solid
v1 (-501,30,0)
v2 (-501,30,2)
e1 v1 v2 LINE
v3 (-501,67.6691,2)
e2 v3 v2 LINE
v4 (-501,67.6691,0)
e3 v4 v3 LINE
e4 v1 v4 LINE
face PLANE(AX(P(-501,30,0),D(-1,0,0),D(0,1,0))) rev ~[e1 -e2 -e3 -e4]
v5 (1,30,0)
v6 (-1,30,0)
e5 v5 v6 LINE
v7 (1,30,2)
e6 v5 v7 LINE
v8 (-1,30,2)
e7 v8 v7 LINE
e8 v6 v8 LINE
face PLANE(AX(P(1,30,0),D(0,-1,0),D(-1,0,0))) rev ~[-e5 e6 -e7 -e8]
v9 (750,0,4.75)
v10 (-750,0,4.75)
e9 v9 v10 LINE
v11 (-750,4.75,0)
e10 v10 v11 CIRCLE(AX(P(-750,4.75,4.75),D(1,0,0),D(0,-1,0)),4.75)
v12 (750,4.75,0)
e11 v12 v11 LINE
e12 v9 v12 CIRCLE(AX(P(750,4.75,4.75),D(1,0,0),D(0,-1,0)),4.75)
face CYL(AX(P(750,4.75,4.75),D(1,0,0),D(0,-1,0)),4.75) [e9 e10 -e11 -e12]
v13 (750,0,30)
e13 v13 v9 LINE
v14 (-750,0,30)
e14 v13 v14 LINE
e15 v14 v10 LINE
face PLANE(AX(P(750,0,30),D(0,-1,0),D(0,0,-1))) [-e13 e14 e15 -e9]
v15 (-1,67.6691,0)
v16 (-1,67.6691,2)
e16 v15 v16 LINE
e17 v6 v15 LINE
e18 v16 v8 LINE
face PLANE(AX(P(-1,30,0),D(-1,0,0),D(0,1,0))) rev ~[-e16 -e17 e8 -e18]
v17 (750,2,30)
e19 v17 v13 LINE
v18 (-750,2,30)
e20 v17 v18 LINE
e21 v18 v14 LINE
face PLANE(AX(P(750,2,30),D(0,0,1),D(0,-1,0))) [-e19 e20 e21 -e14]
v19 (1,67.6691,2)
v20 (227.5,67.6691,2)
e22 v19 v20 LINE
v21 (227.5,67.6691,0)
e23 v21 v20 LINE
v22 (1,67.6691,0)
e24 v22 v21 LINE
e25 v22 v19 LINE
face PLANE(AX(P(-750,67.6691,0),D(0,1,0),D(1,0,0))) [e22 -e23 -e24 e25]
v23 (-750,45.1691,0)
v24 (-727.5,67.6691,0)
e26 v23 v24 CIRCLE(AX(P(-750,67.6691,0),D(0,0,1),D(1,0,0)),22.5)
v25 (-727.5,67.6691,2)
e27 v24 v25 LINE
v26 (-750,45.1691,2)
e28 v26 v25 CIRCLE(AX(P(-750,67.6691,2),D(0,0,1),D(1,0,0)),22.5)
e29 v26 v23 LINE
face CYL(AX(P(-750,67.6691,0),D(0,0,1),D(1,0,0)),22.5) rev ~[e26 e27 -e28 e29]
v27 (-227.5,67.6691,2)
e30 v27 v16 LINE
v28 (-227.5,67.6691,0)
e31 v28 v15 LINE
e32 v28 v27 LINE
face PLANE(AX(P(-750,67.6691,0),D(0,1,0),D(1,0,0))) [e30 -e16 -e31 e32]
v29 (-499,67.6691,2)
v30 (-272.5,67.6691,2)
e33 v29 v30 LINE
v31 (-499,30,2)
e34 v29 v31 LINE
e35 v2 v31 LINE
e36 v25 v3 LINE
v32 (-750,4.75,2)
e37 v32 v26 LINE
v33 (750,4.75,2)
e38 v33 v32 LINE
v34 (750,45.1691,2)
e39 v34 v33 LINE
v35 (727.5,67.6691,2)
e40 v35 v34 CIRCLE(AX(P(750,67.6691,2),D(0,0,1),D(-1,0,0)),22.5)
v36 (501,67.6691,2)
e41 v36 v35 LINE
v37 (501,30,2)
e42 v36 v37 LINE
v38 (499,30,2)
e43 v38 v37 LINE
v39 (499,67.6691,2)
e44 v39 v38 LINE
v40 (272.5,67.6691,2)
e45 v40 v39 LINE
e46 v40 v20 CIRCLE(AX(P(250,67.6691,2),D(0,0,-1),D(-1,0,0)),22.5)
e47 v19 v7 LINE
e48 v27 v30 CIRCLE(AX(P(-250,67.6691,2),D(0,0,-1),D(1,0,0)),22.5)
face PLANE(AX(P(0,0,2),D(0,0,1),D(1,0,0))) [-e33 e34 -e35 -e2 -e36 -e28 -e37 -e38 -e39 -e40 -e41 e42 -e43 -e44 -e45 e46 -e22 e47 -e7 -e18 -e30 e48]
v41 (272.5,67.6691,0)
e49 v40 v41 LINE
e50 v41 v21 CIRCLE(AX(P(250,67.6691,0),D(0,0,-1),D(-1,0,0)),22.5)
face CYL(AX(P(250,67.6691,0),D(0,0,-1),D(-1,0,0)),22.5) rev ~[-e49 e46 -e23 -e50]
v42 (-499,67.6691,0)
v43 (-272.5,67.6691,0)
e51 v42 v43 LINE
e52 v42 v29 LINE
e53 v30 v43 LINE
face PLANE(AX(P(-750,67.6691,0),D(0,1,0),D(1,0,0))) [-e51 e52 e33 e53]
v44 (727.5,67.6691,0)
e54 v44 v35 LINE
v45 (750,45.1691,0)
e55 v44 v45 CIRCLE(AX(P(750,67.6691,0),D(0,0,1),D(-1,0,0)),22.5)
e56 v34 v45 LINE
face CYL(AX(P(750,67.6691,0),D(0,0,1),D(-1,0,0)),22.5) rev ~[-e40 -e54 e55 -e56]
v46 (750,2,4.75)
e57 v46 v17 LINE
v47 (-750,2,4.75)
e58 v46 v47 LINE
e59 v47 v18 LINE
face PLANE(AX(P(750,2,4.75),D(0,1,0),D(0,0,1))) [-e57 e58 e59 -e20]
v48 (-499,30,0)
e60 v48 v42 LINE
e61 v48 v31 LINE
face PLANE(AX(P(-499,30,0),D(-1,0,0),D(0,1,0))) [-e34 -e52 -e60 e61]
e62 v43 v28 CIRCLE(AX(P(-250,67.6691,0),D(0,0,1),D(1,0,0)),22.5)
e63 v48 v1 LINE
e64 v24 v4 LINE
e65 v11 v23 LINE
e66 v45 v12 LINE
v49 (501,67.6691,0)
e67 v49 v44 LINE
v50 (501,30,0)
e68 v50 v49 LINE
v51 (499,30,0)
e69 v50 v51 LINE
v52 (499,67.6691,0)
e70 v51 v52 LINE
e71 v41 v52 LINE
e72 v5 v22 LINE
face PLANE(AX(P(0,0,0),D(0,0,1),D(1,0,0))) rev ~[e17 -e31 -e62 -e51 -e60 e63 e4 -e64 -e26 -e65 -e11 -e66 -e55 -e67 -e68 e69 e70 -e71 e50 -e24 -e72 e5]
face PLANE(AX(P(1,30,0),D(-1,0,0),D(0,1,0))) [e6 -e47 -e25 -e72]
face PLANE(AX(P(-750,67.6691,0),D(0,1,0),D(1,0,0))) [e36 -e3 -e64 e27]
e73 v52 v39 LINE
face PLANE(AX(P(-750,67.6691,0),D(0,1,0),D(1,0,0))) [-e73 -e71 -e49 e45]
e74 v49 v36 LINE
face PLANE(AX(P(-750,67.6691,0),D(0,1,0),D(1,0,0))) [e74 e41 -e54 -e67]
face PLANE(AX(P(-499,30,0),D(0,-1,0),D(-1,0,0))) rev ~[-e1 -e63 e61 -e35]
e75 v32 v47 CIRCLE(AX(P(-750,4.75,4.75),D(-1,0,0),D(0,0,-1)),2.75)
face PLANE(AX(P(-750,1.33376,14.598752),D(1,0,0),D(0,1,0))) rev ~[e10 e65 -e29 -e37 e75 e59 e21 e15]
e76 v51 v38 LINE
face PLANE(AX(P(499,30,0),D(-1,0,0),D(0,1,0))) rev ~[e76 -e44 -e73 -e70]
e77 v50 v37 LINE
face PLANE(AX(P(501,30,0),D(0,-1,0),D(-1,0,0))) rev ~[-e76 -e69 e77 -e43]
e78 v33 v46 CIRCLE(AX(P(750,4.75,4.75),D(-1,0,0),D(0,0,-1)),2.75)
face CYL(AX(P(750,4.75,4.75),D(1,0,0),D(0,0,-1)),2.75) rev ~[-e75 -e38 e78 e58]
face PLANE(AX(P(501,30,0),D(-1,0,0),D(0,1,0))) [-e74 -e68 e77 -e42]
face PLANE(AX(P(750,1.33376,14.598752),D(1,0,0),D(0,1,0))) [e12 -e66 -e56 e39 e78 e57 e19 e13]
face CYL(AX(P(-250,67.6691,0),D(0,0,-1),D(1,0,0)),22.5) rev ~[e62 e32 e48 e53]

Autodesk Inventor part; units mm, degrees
ref_plane "YZ Plane" through (0, 0, 0) normal (1, 0, 0) x (0, 1, 0)
ref_plane "XZ Plane" through (0, 0, 0) normal (0, 1, 0) x (-1, 0, 0)
ref_plane "XY Plane" through (0, 0, 0) normal (0, 0, 1) x (1, 0, 0)
sketch "Sketch1" plane through (0, 0, 0) normal (0, 0, 1) x (1, 0, 0)
  line L0 (-750, 67.6691) -> (750, 67.6691)
  line L1 (750, 67.6691) -> (750, 0)
  line L2 (750, 0) -> (-750, 0)
  line L3 (-750, 0) -> (-750, 67.6691)
  point P0 (0, 0)
  point P1 (0, 0)
  dimension "d0" = 1500
  dimension "d1" = 67.669
extrude "Plate1" add sketch "Sketch1" along normal blind 2
sketch "Sketch2" plane through (750, 2, 0) normal (0, -1, 0) x (1, 0, 0)
  line L0 (-1500, 0) -> (0, 0)
  line L1 (0, 0) -> (0, 30)
  line L2 (0, 30) -> (-1500, 30)
  line L3 (-1500, 30) -> (-1500, 0)
edge flange "Flange1" height 30 angle 90 thickness 2 bend radius 2.75 thickness toward (0, -1, 0) relief round relief width 2 relief depth 1 edges at (0, 0, 2) wall of the first edge with corners at (-750, 2, 0) (750, 2, 0) (750, 2, 30) (-750, 2, 30)
bend "Bend1"
corner "Corner1"
sketch "Sketch5" plane through (0, 0, 0) normal (0, 0, -1) x (-1, 0, 0)
  line L0 (750, 67.6691) -> (-750, 67.6691) projected
  line L1 (-1, 30) -> (-1, 67.6691)
  line L2 (750, 0) -> (-750, 0) projected
  line L3 (-1, 30) -> (1, 30)
  line L4 (1, 30) -> (1, 67.6691)
  point P0 (0, 0)
  point P1 (0, 30)
  point P2 (0, 0)
  dimension "d27" = 2
  dimension "d29" = 30
extrude "Extrusion1" cut sketch "Sketch5" against normal through all
pattern_linear "Rectangular Pattern1" count 3 spacing 500 along (1, 0, 0) of "Extrusion1" first direction both ways yes
sketch "Sketch6" plane through (0, 0, 0) normal (0, 0, -1) x (-1, 0, 0)
  line L0 (-750, 67.6691) -> (-750, 4.75) projected
  circle A0 centre (-750, 67.6691) radius 22.5
  line L1 (-750, 67.6691) -> (750, 67.6691) projected
  line L2 (-1, 67.6691) -> (-1, 30) projected
  line L3 (-499, 30) -> (-499, 67.6691) projected
  line L4 (-1, 30) -> (-499, 30) construction
  circle A1 centre (-250, 67.6691) radius 22.5
  point P0 (0, 0)
  point P1 (-727.5, 67.6691)
  point P2 (-750, 45.1691)
  point P3 (-250, 30)
  dimension "d24" = 45
extrude "Extrusion2" cut sketch "Sketch6" along normal mid plane 30 contours L1 A0 L0 | A1 L1 | L1 A1 picked at (-748.3311, 52.8571)
mirror "Mirror1" about plane through (0, 0, 0) normal (1, 0, 0) of "Extrusion2"
sketch "Sketch7" plane through (0, 0, 2) normal (0, 0, 1) x (1, 0, 0)
  arc A0 (-750, 45.1691) -> (-727.5, 67.6691) centre (-750, 67.6691) ccw projected
  line L0 (-750, 4.75) -> (-750, 45.1691) projected
  line L1 (-750, 4.75) -> (750, 4.75) projected
  line L2 (750, 45.1691) -> (750, 4.75) projected
  arc A1 (727.5, 67.6691) -> (750, 45.1691) centre (750, 67.6691) ccw projected
  line L3 (501, 67.6691) -> (727.5, 67.6691) projected
  line L4 (501, 67.6691) -> (501, 30) projected
  line L5 (501, 30) -> (499, 30) projected
  line L6 (499, 30) -> (499, 67.6691) projected
  line L7 (1, 67.6691) -> (227.5, 67.6691) projected
  line L8 (1, 67.6691) -> (1, 30) projected
  line L9 (1, 30) -> (-1, 30) projected
  line L10 (-1, 30) -> (-1, 67.6691) projected
  line L11 (-499, 67.6691) -> (-272.5, 67.6691) projected
  line L12 (-499, 67.6691) -> (-499, 30) projected
  line L13 (-499, 30) -> (-501, 30) projected
  line L14 (-501, 30) -> (-501, 67.6691) projected
  line L15 (-727.5, 67.6691) -> (-501, 67.6691) projected
  line L16 (649, 32.2095) -> (651, 32.2095)
  line L17 (651, 32.2095) -> (651, 40.2095)
  line L18 (651, 40.2095) -> (649, 40.2095)
  line L19 (649, 40.2095) -> (649, 32.2095)
  line L20 (-750, 4.75) -> (750, 4.75) projected
  line L21 (650, 4.75) -> (650, 67.6691) construction
  line L22 (637, 32.2095) -> (639, 32.2095)
  line L23 (639, 32.2095) -> (639, 40.2095)
  line L24 (639, 40.2095) -> (637, 40.2095)
  line L25 (637, 40.2095) -> (637, 32.2095)
  line L26 (272.5, 67.6691) -> (499, 67.6691) projected
  arc A2 (227.5, 67.6691) -> (272.5, 67.6691) centre (250, 67.6691) ccw projected
  line L27 (-227.5, 67.6691) -> (-1, 67.6691) projected
  arc A3 (-272.5, 67.6691) -> (-227.5, 67.6691) centre (-250, 67.6691) ccw projected
  point P0 (0, 0)
  point P1 (650, 32.2095)
  point P2 (649, 36.2095)
  point P3 (650, 36.2095)
  point P4 (639, 36.2095)
  dimension "d30" = 2
  dimension "d31" = 8
  dimension "d32" = 100
  dimension "d33" = 2
  dimension "d34" = 8
  dimension "d35" = 10
extrude "Extrusion3" [suppressed]
mirror "Mirror2" [suppressed]
sketch "Sketch9" plane through (0, 0, 2) normal (0, 0, 1) x (1, 0, 0)
  line L0 (494, 62.6691) -> (494, 50.6691) construction
  line L1 (494, 50.6691) -> (294, 50.6691) construction
  line L2 (294, 50.6691) -> (294, 62.6691) construction
  line L3 (294, 62.6691) -> (494, 62.6691) construction
  line L4 (499, 30) -> (499, 67.6691) projected
  line L5 (1, 67.6691) -> (499, 67.6691) projected
  point P0 (0, 0)
  dimension "d40" = 200
  dimension "d41" = 12
  dimension "d42" = 5
  dimension "d43" = 5
mark "Mark2"
equation "\"d1\" = Стрингер_2"
equation "\"d27\" = d18"
equation "\"d29\" = Стрингер_глубина_паза"
equation "\"d43\" = d42"
equation "\"d2\" = Thickness"
equation "\"d3\" = BendReliefWidth"
equation "\"d4\" = BendReliefDepth"
equation "\"d5\" = MinimumRemnant"
equation "\"d6\" = TransitionRadius"
equation "\"d9\" = BendRadius"
equation "\"d10\" = CornerReliefSize"
equation "\"d11\" = GapSize"
equation "\"d12\" = JacobiRadiusSize"
equation "\"BendReliefWidth\" = Thickness"
equation "\"BendReliefDepth\" = 0.5 * Thickness"
equation "\"CornerReliefSize\" = 4 * Thickness"
equation "\"MinimumRemnant\" = 2 * Thickness"
equation "\"TransitionRadius\" = BendRadius"
equation "\"JacobiRadiusSize\" = BendRadius"
equation "\"GapSize\" = Thickness"
equation "\"d18\" = Thickness"
equation "\"qqqqqq\" = 67.35706"
equation "\"Стрингер_2\" = 67.669053"
equation "\"Стрингер_глубина_паза\" = 30"
equation "\"Thickness\" = 2"
equation "\"BendRadius\" = 2.75"
properties part number "МОО 062 stringer спина ^^" material "Stainless Steel"
